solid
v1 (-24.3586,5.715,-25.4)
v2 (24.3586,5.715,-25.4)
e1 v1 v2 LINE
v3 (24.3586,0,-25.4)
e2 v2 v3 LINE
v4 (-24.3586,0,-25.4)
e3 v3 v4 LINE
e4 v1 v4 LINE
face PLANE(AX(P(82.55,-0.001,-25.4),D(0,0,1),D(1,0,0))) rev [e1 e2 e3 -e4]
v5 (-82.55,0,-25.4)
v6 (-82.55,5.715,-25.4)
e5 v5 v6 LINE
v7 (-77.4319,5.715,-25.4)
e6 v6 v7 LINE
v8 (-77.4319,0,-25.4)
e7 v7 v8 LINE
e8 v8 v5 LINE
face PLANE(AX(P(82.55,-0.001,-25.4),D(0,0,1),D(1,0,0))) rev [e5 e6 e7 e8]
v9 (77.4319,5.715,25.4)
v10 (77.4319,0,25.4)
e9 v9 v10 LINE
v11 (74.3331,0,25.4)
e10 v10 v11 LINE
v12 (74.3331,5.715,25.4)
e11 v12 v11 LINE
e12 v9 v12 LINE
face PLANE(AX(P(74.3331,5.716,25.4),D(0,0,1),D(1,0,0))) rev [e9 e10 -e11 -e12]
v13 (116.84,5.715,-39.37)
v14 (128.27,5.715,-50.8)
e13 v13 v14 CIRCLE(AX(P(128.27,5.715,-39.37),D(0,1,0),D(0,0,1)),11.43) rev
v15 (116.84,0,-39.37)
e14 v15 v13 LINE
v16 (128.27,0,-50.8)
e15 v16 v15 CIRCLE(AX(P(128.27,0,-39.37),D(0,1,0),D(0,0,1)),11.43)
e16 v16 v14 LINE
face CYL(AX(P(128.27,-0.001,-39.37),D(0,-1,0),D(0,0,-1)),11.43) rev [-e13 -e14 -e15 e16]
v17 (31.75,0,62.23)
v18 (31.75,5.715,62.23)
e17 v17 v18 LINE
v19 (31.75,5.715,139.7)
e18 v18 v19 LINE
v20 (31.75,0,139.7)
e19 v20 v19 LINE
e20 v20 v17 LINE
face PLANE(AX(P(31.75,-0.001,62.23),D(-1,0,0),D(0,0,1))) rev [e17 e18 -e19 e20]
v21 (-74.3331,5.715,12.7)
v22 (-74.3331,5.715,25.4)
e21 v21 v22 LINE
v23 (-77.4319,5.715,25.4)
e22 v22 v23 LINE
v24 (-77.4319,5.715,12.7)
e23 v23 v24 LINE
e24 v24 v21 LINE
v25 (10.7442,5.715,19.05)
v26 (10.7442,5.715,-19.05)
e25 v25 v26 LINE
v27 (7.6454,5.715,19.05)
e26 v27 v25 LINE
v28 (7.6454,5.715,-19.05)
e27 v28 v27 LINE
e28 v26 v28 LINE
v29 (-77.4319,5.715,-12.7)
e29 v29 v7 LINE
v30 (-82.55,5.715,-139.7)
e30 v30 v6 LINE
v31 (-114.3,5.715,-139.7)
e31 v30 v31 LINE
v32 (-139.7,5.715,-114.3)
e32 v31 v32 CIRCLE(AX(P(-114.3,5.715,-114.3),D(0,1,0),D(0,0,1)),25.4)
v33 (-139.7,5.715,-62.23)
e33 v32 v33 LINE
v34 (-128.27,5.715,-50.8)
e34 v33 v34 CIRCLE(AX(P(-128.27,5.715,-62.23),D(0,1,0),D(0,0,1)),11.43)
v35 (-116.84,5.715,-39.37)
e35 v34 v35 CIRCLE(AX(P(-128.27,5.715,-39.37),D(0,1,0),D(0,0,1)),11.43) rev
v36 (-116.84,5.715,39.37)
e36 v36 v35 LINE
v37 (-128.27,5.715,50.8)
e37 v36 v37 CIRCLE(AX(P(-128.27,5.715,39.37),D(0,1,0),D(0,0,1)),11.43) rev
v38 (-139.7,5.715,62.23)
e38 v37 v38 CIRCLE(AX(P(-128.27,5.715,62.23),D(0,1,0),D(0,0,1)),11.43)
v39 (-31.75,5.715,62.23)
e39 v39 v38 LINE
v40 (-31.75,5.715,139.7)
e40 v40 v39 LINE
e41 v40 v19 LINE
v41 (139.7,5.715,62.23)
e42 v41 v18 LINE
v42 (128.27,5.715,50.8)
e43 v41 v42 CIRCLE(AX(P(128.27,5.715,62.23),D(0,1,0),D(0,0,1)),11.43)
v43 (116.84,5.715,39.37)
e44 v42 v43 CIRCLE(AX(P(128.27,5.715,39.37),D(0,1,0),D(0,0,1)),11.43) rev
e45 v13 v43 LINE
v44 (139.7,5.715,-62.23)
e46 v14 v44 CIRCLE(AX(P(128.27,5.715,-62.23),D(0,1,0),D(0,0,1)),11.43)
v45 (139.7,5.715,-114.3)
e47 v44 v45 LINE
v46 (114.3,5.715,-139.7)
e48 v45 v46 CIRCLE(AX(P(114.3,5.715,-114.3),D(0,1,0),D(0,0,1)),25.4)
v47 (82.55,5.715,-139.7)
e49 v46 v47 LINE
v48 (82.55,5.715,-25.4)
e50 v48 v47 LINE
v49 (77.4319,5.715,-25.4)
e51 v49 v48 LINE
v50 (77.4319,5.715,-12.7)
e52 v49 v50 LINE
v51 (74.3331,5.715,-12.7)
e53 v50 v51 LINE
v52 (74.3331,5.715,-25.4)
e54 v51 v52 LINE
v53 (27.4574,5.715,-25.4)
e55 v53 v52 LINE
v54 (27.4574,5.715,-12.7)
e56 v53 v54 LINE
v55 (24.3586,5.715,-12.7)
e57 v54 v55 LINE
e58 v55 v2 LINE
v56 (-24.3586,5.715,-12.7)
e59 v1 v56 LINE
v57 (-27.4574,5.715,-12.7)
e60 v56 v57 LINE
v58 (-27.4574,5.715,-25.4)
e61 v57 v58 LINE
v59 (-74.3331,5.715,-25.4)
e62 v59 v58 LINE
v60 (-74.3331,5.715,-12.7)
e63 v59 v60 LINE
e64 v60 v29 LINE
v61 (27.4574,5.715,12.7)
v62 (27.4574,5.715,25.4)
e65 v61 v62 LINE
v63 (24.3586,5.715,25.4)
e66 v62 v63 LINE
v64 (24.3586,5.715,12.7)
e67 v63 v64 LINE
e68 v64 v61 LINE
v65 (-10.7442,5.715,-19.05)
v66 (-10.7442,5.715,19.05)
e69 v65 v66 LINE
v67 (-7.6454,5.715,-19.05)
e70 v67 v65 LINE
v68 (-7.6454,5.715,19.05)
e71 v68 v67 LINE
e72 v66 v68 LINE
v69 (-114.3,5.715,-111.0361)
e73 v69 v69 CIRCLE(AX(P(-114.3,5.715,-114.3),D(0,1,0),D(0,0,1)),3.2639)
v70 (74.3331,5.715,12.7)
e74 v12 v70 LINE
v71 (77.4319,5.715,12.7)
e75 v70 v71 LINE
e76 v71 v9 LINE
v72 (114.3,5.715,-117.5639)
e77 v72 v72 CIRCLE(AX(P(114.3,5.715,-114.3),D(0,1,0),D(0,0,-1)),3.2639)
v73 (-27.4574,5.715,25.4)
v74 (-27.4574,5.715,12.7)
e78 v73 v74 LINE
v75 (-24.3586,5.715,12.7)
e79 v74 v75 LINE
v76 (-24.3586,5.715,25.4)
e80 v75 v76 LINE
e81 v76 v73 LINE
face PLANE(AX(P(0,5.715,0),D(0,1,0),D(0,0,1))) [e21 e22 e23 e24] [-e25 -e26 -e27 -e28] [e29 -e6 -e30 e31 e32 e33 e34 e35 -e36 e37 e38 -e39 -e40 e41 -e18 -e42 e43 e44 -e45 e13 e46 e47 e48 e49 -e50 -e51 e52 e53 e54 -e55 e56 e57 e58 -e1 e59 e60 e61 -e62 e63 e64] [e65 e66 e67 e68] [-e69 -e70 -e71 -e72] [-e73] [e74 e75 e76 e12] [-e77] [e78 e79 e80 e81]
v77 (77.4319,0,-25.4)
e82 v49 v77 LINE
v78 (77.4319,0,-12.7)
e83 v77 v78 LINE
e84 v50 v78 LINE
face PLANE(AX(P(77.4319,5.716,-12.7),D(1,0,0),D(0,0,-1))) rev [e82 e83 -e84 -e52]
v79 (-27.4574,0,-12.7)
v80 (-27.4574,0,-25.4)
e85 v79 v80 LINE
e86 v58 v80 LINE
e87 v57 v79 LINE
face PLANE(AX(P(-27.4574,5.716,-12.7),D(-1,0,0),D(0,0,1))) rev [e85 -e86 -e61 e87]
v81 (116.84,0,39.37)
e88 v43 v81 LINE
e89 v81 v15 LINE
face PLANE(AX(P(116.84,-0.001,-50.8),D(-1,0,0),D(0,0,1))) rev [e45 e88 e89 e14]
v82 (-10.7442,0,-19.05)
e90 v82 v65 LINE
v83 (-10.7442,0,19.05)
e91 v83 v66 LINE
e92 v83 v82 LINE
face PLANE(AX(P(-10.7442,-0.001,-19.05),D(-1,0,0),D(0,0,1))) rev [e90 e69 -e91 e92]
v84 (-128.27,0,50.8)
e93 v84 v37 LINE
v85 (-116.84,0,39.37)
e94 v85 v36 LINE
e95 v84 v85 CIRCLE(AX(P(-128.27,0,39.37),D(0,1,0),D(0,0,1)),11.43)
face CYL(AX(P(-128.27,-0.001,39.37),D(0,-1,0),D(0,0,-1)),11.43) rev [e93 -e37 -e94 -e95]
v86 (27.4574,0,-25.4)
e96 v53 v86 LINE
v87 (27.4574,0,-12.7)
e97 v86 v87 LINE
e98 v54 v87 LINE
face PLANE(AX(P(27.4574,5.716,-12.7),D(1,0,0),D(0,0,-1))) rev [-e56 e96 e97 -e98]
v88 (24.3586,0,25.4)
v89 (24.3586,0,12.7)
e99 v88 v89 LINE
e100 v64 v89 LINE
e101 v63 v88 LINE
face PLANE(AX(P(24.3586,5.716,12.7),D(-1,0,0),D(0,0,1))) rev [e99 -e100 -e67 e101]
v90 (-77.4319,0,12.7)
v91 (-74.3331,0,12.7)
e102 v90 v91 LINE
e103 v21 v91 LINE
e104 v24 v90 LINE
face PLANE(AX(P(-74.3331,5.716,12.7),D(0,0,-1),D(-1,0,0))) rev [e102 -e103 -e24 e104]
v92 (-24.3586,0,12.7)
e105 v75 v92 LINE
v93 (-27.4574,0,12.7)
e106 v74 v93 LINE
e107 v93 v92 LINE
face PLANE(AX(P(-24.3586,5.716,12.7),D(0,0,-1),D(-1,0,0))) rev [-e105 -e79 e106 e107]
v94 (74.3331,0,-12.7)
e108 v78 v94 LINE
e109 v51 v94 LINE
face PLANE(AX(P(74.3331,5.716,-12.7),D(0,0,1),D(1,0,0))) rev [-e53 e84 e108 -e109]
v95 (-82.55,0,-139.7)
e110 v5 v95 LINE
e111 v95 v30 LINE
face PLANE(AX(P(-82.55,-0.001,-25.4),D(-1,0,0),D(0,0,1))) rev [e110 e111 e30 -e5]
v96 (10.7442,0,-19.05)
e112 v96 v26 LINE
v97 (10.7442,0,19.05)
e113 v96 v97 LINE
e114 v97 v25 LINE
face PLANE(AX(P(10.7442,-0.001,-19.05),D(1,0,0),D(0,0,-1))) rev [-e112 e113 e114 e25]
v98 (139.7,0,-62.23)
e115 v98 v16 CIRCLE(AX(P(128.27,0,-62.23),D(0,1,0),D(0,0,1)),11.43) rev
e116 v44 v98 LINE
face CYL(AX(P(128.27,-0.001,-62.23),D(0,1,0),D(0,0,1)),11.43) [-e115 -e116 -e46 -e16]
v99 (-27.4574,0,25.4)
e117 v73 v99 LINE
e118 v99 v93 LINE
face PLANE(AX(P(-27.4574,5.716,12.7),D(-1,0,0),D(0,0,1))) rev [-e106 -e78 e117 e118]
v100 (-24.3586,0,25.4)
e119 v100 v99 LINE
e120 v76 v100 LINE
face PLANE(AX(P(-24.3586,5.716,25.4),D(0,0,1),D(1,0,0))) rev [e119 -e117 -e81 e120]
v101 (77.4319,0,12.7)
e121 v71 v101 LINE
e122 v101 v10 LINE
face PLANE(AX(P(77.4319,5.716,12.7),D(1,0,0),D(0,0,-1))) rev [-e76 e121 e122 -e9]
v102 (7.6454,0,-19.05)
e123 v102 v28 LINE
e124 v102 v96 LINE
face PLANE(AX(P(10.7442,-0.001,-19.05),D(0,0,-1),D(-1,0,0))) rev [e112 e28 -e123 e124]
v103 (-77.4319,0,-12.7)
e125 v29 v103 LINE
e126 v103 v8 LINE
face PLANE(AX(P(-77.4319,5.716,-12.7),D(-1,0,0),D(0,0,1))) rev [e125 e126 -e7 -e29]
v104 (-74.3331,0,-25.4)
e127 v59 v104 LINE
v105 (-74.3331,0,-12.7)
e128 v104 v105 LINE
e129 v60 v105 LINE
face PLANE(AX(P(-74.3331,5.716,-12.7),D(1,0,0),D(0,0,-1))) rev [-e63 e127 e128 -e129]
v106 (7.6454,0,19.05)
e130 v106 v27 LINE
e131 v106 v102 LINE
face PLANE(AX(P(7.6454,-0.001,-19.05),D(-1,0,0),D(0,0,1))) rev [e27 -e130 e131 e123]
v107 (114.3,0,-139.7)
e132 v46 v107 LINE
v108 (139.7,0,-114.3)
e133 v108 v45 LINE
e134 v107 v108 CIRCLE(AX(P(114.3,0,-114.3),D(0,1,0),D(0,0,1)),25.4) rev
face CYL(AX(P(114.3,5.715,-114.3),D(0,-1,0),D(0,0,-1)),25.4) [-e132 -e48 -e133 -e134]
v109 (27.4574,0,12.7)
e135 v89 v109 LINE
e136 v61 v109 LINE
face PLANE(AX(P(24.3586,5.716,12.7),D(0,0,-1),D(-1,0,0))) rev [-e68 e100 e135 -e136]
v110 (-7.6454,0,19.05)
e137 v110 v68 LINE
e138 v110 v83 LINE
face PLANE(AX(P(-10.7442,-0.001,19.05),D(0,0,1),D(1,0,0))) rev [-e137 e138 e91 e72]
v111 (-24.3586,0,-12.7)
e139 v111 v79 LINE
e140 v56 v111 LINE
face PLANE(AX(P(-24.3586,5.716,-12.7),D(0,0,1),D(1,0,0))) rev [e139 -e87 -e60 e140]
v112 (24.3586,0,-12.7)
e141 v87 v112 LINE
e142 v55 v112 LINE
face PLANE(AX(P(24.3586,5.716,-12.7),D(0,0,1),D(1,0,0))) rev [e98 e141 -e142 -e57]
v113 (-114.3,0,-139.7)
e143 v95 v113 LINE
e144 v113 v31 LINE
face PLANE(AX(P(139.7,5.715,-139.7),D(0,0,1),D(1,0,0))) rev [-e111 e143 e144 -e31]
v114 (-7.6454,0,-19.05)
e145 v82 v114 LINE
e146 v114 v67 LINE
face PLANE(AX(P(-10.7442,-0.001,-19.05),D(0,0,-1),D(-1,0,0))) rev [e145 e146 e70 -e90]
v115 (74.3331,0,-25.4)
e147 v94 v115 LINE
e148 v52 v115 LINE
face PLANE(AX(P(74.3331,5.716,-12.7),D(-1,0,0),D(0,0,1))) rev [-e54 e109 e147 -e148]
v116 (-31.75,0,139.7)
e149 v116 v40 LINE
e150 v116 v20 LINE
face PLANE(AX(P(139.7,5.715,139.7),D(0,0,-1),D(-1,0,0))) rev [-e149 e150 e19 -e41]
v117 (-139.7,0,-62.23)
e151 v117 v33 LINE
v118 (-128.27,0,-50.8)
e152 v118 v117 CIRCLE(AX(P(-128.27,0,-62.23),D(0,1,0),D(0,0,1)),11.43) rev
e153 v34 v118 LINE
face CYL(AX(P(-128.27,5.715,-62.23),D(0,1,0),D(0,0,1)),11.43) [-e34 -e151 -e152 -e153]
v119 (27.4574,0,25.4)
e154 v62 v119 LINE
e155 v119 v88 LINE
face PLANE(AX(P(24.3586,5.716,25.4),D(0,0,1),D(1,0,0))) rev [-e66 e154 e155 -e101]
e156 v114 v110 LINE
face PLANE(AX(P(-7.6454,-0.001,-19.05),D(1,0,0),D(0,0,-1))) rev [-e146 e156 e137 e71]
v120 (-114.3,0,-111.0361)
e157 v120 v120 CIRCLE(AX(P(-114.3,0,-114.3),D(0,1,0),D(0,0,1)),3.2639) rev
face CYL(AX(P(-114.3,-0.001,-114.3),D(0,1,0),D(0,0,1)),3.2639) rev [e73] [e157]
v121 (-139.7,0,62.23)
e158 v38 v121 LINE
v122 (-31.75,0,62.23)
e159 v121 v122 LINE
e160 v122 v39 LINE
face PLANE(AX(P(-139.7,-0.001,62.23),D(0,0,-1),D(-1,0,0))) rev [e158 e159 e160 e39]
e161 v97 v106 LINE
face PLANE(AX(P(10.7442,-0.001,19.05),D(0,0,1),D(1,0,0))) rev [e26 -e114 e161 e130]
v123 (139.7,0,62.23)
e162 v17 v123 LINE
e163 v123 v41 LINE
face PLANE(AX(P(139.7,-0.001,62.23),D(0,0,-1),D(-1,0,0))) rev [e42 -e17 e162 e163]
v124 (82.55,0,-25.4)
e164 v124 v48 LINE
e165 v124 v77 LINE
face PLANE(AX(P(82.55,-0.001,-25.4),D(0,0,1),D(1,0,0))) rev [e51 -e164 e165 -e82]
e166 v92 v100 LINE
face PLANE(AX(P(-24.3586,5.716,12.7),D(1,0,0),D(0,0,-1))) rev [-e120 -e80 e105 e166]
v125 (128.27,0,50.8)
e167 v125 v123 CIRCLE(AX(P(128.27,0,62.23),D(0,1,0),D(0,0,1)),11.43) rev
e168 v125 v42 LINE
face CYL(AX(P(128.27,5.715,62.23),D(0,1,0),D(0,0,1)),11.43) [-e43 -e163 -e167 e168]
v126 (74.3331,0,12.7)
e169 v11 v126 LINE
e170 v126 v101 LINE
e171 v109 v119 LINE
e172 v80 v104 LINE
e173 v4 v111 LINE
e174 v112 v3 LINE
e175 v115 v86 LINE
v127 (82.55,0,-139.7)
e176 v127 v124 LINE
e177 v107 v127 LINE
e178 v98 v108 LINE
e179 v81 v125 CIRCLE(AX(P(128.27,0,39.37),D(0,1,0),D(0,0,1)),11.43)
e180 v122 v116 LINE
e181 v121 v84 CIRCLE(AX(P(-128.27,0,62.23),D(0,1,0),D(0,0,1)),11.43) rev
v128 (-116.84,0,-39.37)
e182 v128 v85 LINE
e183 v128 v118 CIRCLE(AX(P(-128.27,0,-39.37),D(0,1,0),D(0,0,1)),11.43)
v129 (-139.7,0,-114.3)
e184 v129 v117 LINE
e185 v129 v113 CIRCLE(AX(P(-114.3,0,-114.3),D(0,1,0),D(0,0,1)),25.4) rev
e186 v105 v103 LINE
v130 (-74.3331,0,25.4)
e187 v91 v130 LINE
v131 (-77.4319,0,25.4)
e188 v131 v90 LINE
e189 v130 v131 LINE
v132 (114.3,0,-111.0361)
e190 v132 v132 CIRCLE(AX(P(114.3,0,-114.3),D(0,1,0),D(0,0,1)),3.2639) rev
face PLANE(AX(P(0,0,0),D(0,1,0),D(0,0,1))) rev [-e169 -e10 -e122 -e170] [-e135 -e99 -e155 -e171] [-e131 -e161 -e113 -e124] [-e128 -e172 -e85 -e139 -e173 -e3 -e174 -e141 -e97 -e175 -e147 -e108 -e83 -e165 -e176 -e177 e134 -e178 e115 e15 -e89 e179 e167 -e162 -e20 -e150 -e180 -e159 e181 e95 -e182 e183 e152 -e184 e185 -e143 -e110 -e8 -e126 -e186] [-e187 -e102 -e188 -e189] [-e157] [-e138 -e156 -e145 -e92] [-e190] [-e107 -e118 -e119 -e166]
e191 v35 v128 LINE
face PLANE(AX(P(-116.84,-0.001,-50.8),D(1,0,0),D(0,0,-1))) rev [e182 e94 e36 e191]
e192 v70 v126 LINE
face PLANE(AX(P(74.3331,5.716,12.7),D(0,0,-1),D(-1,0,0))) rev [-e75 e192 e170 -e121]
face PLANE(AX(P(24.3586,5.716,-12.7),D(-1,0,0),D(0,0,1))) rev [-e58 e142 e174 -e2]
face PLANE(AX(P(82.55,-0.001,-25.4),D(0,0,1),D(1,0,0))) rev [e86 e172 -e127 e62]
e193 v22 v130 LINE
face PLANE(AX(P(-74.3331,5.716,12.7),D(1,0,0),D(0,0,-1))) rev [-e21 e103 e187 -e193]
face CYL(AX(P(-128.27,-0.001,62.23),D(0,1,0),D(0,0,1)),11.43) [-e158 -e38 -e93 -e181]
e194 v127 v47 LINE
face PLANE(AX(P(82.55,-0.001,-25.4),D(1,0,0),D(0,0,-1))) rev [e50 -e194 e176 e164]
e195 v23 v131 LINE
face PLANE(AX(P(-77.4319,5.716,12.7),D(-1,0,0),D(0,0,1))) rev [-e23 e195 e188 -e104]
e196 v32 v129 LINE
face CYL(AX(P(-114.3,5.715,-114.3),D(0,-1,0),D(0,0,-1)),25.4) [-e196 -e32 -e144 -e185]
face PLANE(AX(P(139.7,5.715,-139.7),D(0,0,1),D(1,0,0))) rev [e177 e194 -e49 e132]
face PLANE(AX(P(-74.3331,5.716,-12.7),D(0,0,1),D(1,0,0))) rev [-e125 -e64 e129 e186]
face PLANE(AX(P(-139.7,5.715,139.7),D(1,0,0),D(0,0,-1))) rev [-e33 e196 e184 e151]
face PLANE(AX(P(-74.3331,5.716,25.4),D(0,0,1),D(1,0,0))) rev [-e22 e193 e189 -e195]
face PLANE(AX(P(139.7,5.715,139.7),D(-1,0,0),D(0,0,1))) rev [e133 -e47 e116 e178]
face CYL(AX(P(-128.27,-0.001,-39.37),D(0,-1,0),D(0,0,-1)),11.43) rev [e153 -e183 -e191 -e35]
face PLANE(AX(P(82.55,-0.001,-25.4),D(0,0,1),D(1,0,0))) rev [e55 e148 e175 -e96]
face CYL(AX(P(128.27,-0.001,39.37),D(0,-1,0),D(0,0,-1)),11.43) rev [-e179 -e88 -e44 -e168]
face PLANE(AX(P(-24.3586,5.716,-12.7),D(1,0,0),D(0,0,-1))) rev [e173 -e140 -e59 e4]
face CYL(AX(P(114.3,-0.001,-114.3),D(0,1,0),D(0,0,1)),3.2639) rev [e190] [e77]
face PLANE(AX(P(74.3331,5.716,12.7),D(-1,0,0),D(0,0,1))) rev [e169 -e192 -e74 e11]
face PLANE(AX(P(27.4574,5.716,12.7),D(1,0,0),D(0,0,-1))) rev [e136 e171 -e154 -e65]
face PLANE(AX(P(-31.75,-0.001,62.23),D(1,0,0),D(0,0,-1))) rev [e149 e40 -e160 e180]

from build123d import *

# Parameters (mm, degrees)
SKETCH1_W           = 279.4
SKETCH1_H           = 279.4
BOSS_EXTRUDE1_DEPTH = 5.715
CUT_EXTRUDE2_REACH  = 199.648
SKETCH4_W           = 22.86
SKETCH4_H           = 101.6
FILLET1_START       = -1
FILLET1_DEPTH       = 8
FILLET1_2_DEPTH     = 5.715
CUT_EXTRUDE3_REACH  = 199.648
SKETCH5_W           = 3.0988
SKETCH5_H           = 12.7
CUT_EXTRUDE4_REACH  = 199.648
SKETCH6_R           = 3.2639
FILLET2_R           = 25.4
CUT_EXTRUDE5_REACH  = 199.648
SKETCH7_W           = 165.1
SKETCH7_H           = 114.3
CUT_EXTRUDE7_REACH  = 199.648
SKETCH16_W          = 3.0988
SKETCH16_H          = 38.1
CUT_EXTRUDE11_REACH = 199.648
SKETCH26_W          = 107.95
SKETCH26_H          = 77.47


with BuildPart() as part:
    # Sketch1 → Boss-Extrude1 (new body)
    with BuildSketch(Plane(origin=(0, 0, 0), x_dir=(1, 0, 0), z_dir=(0, 1, 0))):
        Rectangle(SKETCH1_W, SKETCH1_H)
    extrude(amount=BOSS_EXTRUDE1_DEPTH)

    # Sketch4 → Cut-Extrude2 (cut, up to next)
    with BuildSketch(Plane(origin=(0, 5.715, 0), x_dir=(1, 0, 0), z_dir=(0, 1, 0)), mode=Mode.PRIVATE) as cut_extrude2_sk1:
        with Locations((-128.27, 0)):
            Rectangle(SKETCH4_W, SKETCH4_H)
    cut_extrude2_tool1 = extrude(cut_extrude2_sk1.sketch, amount=-CUT_EXTRUDE2_REACH, mode=Mode.PRIVATE) & part.part
    # Sketch4 → Cut-Extrude2 (cut, up to next)
    with BuildSketch(Plane(origin=(0, 5.715, 0), x_dir=(1, 0, 0), z_dir=(0, 1, 0)), mode=Mode.PRIVATE) as cut_extrude2_sk2:
        with Locations((128.27, 0)):
            Rectangle(SKETCH4_W, SKETCH4_H)
    cut_extrude2_tool2 = extrude(cut_extrude2_sk2.sketch, amount=-CUT_EXTRUDE2_REACH, mode=Mode.PRIVATE) & part.part
    add(cut_extrude2_tool1.solids().sort_by_distance((-128.27, 5.715, 0))[0], mode=Mode.SUBTRACT)
    add(cut_extrude2_tool2.solids().sort_by_distance((128.27, 5.715, 0))[0], mode=Mode.SUBTRACT)

    # Fillet1: read off the stored shape, not the designer's step
    # Fillet1 outline → Fillet1 (cut)
    with BuildSketch(Plane(origin=(0, 0, 0), x_dir=(1, 0, 0), z_dir=(0, 1, 0)).offset(FILLET1_START)):
        with BuildLine():
            ThreePointArc((-139.7, -62.23), (-136.352230509, -54.147769491), (-128.27, -50.8))
            Line((-128.27, -50.8), (-139.7, -50.8))
            Line((-139.7, -50.8), (-139.7, -62.23))
        make_face()
        with BuildLine():
            ThreePointArc((-128.27, 50.8), (-136.352230509, 54.147769491), (-139.7, 62.23))
            Line((-139.7, 62.23), (-139.7, 50.8))
            Line((-139.7, 50.8), (-128.27, 50.8))
        make_face()
        with BuildLine():
            Line((139.7, -50.8), (128.27, -50.8))
            ThreePointArc((128.27, -50.8), (136.352230509, -54.147769491), (139.7, -62.23))
            Line((139.7, -62.23), (139.7, -50.8))
        make_face()
        with BuildLine():
            ThreePointArc((139.7, 62.23), (136.352230509, 54.147769491), (128.27, 50.8))
            Line((128.27, 50.8), (139.7, 50.8))
            Line((139.7, 50.8), (139.7, 62.23))
        make_face()
    extrude(amount=FILLET1_DEPTH, mode=Mode.SUBTRACT)

    # Fillet1 2 outline → Fillet1 2 (add)
    with BuildSketch(Plane(origin=(0, 0, 0), x_dir=(1, 0, 0), z_dir=(0, 1, 0))):
        with BuildLine():
            Line((-116.84, -50.8), (-116.84, -39.37))
            ThreePointArc((-116.84, -39.37), (-120.187769491, -47.452230509), (-128.27, -50.8))
            Line((-128.27, -50.8), (-116.84, -50.8))
        make_face()
        with BuildLine():
            Line((-116.84, 50.8), (-128.27, 50.8))
            ThreePointArc((-128.27, 50.8), (-120.187769491, 47.452230509), (-116.84, 39.37))
            Line((-116.84, 39.37), (-116.84, 50.8))
        make_face()
        with BuildLine():
            Line((116.84, -50.8), (128.27, -50.8))
            ThreePointArc((128.27, -50.8), (120.187769491, -47.452230509), (116.84, -39.37))
            Line((116.84, -39.37), (116.84, -50.8))
        make_face()
        with BuildLine():
            Line((116.84, 50.8), (116.84, 39.37))
            ThreePointArc((116.84, 39.37), (120.187769491, 47.452230509), (128.27, 50.8))
            Line((128.27, 50.8), (116.84, 50.8))
        make_face()
    extrude(amount=FILLET1_2_DEPTH)

    # Sketch5 → Cut-Extrude3 (cut, up to next)
    with BuildSketch(Plane(origin=(0, 0, 0), x_dir=(-1, 0, 0), z_dir=(0, -1, 0)), mode=Mode.PRIVATE) as cut_extrude3_sk1:
        with Locations((75.8825, -19.05)):
            Rectangle(SKETCH5_W, SKETCH5_H)
    cut_extrude3_tool1 = extrude(cut_extrude3_sk1.sketch, amount=-CUT_EXTRUDE3_REACH, mode=Mode.PRIVATE) & part.part
    # Sketch5 → Cut-Extrude3 (cut, up to next)
    with BuildSketch(Plane(origin=(0, 0, 0), x_dir=(-1, 0, 0), z_dir=(0, -1, 0)), mode=Mode.PRIVATE) as cut_extrude3_sk2:
        with Locations((75.8825, 19.05)):
            Rectangle(SKETCH5_W, SKETCH5_H)
    cut_extrude3_tool2 = extrude(cut_extrude3_sk2.sketch, amount=-CUT_EXTRUDE3_REACH, mode=Mode.PRIVATE) & part.part
    # Sketch5 → Cut-Extrude3 (cut, up to next)
    with BuildSketch(Plane(origin=(0, 0, 0), x_dir=(-1, 0, 0), z_dir=(0, -1, 0)), mode=Mode.PRIVATE) as cut_extrude3_sk3:
        with Locations((-75.8825, 19.05)):
            Rectangle(SKETCH5_W, SKETCH5_H)
    cut_extrude3_tool3 = extrude(cut_extrude3_sk3.sketch, amount=-CUT_EXTRUDE3_REACH, mode=Mode.PRIVATE) & part.part
    # Sketch5 → Cut-Extrude3 (cut, up to next)
    with BuildSketch(Plane(origin=(0, 0, 0), x_dir=(-1, 0, 0), z_dir=(0, -1, 0)), mode=Mode.PRIVATE) as cut_extrude3_sk4:
        with Locations((-75.8825, -19.05)):
            Rectangle(SKETCH5_W, SKETCH5_H)
    cut_extrude3_tool4 = extrude(cut_extrude3_sk4.sketch, amount=-CUT_EXTRUDE3_REACH, mode=Mode.PRIVATE) & part.part
    # Sketch5 → Cut-Extrude3 (cut, up to next)
    with BuildSketch(Plane(origin=(0, 0, 0), x_dir=(-1, 0, 0), z_dir=(0, -1, 0)), mode=Mode.PRIVATE) as cut_extrude3_sk5:
        with Locations((25.908, -19.05)):
            Rectangle(SKETCH5_W, SKETCH5_H)
    cut_extrude3_tool5 = extrude(cut_extrude3_sk5.sketch, amount=-CUT_EXTRUDE3_REACH, mode=Mode.PRIVATE) & part.part
    # Sketch5 → Cut-Extrude3 (cut, up to next)
    with BuildSketch(Plane(origin=(0, 0, 0), x_dir=(-1, 0, 0), z_dir=(0, -1, 0)), mode=Mode.PRIVATE) as cut_extrude3_sk6:
        with Locations((25.908, 19.05)):
            Rectangle(SKETCH5_W, SKETCH5_H)
    cut_extrude3_tool6 = extrude(cut_extrude3_sk6.sketch, amount=-CUT_EXTRUDE3_REACH, mode=Mode.PRIVATE) & part.part
    # Sketch5 → Cut-Extrude3 (cut, up to next)
    with BuildSketch(Plane(origin=(0, 0, 0), x_dir=(-1, 0, 0), z_dir=(0, -1, 0)), mode=Mode.PRIVATE) as cut_extrude3_sk7:
        with Locations((-25.908, 19.05)):
            Rectangle(SKETCH5_W, SKETCH5_H)
    cut_extrude3_tool7 = extrude(cut_extrude3_sk7.sketch, amount=-CUT_EXTRUDE3_REACH, mode=Mode.PRIVATE) & part.part
    # Sketch5 → Cut-Extrude3 (cut, up to next)
    with BuildSketch(Plane(origin=(0, 0, 0), x_dir=(-1, 0, 0), z_dir=(0, -1, 0)), mode=Mode.PRIVATE) as cut_extrude3_sk8:
        with Locations((-25.908, -19.05)):
            Rectangle(SKETCH5_W, SKETCH5_H)
    cut_extrude3_tool8 = extrude(cut_extrude3_sk8.sketch, amount=-CUT_EXTRUDE3_REACH, mode=Mode.PRIVATE) & part.part
    add(cut_extrude3_tool1.solids().sort_by_distance((-75.8825, 0, 19.05))[0], mode=Mode.SUBTRACT)
    add(cut_extrude3_tool2.solids().sort_by_distance((-75.8825, 0, -19.05))[0], mode=Mode.SUBTRACT)
    add(cut_extrude3_tool3.solids().sort_by_distance((75.8825, 0, -19.05))[0], mode=Mode.SUBTRACT)
    add(cut_extrude3_tool4.solids().sort_by_distance((75.8825, 0, 19.05))[0], mode=Mode.SUBTRACT)
    add(cut_extrude3_tool5.solids().sort_by_distance((-25.908, 0, 19.05))[0], mode=Mode.SUBTRACT)
    add(cut_extrude3_tool6.solids().sort_by_distance((-25.908, 0, -19.05))[0], mode=Mode.SUBTRACT)
    add(cut_extrude3_tool7.solids().sort_by_distance((25.908, 0, -19.05))[0], mode=Mode.SUBTRACT)
    add(cut_extrude3_tool8.solids().sort_by_distance((25.908, 0, 19.05))[0], mode=Mode.SUBTRACT)

    # Sketch6 → Cut-Extrude4 (cut, up to next)
    with BuildSketch(Plane(origin=(0, 5.715, 0), x_dir=(1, 0, 0), z_dir=(0, 1, 0)), mode=Mode.PRIVATE) as cut_extrude4_sk1:
        with Locations(Location((-114.3, 114.3, 0), (0, 0, 270))):
            Circle(SKETCH6_R)
    cut_extrude4_tool1 = extrude(cut_extrude4_sk1.sketch, amount=-CUT_EXTRUDE4_REACH, mode=Mode.PRIVATE) & part.part
    # Sketch6 → Cut-Extrude4 (cut, up to next)
    with BuildSketch(Plane(origin=(0, 5.715, 0), x_dir=(1, 0, 0), z_dir=(0, 1, 0)), mode=Mode.PRIVATE) as cut_extrude4_sk2:
        with Locations(Location((114.3, 114.3, 0), (0, 0, 270))):
            Circle(SKETCH6_R)
    cut_extrude4_tool2 = extrude(cut_extrude4_sk2.sketch, amount=-CUT_EXTRUDE4_REACH, mode=Mode.PRIVATE) & part.part
    # Sketch6 → Cut-Extrude4 (cut, up to next)
    with BuildSketch(Plane(origin=(0, 5.715, 0), x_dir=(1, 0, 0), z_dir=(0, 1, 0)), mode=Mode.PRIVATE) as cut_extrude4_sk3:
        with Locations(Location((114.3, -114.3, 0), (0, 0, 270))):
            Circle(SKETCH6_R)
    cut_extrude4_tool3 = extrude(cut_extrude4_sk3.sketch, amount=-CUT_EXTRUDE4_REACH, mode=Mode.PRIVATE) & part.part
    # Sketch6 → Cut-Extrude4 (cut, up to next)
    with BuildSketch(Plane(origin=(0, 5.715, 0), x_dir=(1, 0, 0), z_dir=(0, 1, 0)), mode=Mode.PRIVATE) as cut_extrude4_sk4:
        with Locations(Location((-114.3, -114.3, 0), (0, 0, 270))):
            Circle(SKETCH6_R)
    cut_extrude4_tool4 = extrude(cut_extrude4_sk4.sketch, amount=-CUT_EXTRUDE4_REACH, mode=Mode.PRIVATE) & part.part
    add(cut_extrude4_tool1.solids().sort_by_distance((-114.3, 5.715, -114.3))[0], mode=Mode.SUBTRACT)
    add(cut_extrude4_tool2.solids().sort_by_distance((114.3, 5.715, -114.3))[0], mode=Mode.SUBTRACT)
    add(cut_extrude4_tool3.solids().sort_by_distance((114.3, 5.715, 114.3))[0], mode=Mode.SUBTRACT)
    add(cut_extrude4_tool4.solids().sort_by_distance((-114.3, 5.715, 114.3))[0], mode=Mode.SUBTRACT)

    # Fillet2
    fillet2_edges = [part.edges().sort_by_distance(p)[0] for p in [
        (-139.7, 2.8575, -139.7),
        (139.7, 2.8575, -139.7),
        (139.7, 2.8575, 139.7),
        (-139.7, 2.8575, 139.7),
    ]]
    fillet(fillet2_edges, radius=FILLET2_R)

    # Sketch7 → Cut-Extrude5 (cut, up to next)
    with BuildSketch(Plane(origin=(0, 5.715, 0), x_dir=(1, 0, 0), z_dir=(0, 1, 0)), mode=Mode.PRIVATE) as cut_extrude5_sk1:
        with Locations((0, 82.55)):
            Rectangle(SKETCH7_W, SKETCH7_H)
    cut_extrude5_tool1 = extrude(cut_extrude5_sk1.sketch, amount=-CUT_EXTRUDE5_REACH, mode=Mode.PRIVATE) & part.part
    add(cut_extrude5_tool1.solids().sort_by_distance((0, 5.715, -82.55))[0], mode=Mode.SUBTRACT)

    # Sketch16 → Cut-Extrude7 (cut, up to next)
    with BuildSketch(Plane(origin=(0, 5.715, 0), x_dir=(1, 0, 0), z_dir=(0, 1, 0)), mode=Mode.PRIVATE) as cut_extrude7_sk1:
        with Locations((-9.1948, 0)):
            Rectangle(SKETCH16_W, SKETCH16_H)
    cut_extrude7_tool1 = extrude(cut_extrude7_sk1.sketch, amount=-CUT_EXTRUDE7_REACH, mode=Mode.PRIVATE) & part.part
    # Sketch16 → Cut-Extrude7 (cut, up to next)
    with BuildSketch(Plane(origin=(0, 5.715, 0), x_dir=(1, 0, 0), z_dir=(0, 1, 0)), mode=Mode.PRIVATE) as cut_extrude7_sk2:
        with Locations((9.1948, 0)):
            Rectangle(SKETCH16_W, SKETCH16_H)
    cut_extrude7_tool2 = extrude(cut_extrude7_sk2.sketch, amount=-CUT_EXTRUDE7_REACH, mode=Mode.PRIVATE) & part.part
    add(cut_extrude7_tool1.solids().sort_by_distance((-9.1948, 5.715, 0))[0], mode=Mode.SUBTRACT)
    add(cut_extrude7_tool2.solids().sort_by_distance((9.1948, 5.715, 0))[0], mode=Mode.SUBTRACT)

    # Sketch26 → Cut-Extrude11 (cut, up to next)
    with BuildSketch(Plane(origin=(0, 5.715, 0), x_dir=(1, 0, 0), z_dir=(0, 1, 0)), mode=Mode.PRIVATE) as cut_extrude11_sk1:
        with Locations((-85.725, -100.965)):
            Rectangle(SKETCH26_W, SKETCH26_H)
    cut_extrude11_tool1 = extrude(cut_extrude11_sk1.sketch, amount=-CUT_EXTRUDE11_REACH, mode=Mode.PRIVATE) & part.part
    # Sketch26 → Cut-Extrude11 (cut, up to next)
    with BuildSketch(Plane(origin=(0, 5.715, 0), x_dir=(1, 0, 0), z_dir=(0, 1, 0)), mode=Mode.PRIVATE) as cut_extrude11_sk2:
        with Locations((85.725, -100.965)):
            Rectangle(SKETCH26_W, SKETCH26_H)
    cut_extrude11_tool2 = extrude(cut_extrude11_sk2.sketch, amount=-CUT_EXTRUDE11_REACH, mode=Mode.PRIVATE) & part.part
    add(cut_extrude11_tool1.solids().sort_by_distance((-85.725, 5.715, 100.965))[0], mode=Mode.SUBTRACT)
    add(cut_extrude11_tool2.solids().sort_by_distance((85.725, 5.715, 100.965))[0], mode=Mode.SUBTRACT)


solid = part.part
